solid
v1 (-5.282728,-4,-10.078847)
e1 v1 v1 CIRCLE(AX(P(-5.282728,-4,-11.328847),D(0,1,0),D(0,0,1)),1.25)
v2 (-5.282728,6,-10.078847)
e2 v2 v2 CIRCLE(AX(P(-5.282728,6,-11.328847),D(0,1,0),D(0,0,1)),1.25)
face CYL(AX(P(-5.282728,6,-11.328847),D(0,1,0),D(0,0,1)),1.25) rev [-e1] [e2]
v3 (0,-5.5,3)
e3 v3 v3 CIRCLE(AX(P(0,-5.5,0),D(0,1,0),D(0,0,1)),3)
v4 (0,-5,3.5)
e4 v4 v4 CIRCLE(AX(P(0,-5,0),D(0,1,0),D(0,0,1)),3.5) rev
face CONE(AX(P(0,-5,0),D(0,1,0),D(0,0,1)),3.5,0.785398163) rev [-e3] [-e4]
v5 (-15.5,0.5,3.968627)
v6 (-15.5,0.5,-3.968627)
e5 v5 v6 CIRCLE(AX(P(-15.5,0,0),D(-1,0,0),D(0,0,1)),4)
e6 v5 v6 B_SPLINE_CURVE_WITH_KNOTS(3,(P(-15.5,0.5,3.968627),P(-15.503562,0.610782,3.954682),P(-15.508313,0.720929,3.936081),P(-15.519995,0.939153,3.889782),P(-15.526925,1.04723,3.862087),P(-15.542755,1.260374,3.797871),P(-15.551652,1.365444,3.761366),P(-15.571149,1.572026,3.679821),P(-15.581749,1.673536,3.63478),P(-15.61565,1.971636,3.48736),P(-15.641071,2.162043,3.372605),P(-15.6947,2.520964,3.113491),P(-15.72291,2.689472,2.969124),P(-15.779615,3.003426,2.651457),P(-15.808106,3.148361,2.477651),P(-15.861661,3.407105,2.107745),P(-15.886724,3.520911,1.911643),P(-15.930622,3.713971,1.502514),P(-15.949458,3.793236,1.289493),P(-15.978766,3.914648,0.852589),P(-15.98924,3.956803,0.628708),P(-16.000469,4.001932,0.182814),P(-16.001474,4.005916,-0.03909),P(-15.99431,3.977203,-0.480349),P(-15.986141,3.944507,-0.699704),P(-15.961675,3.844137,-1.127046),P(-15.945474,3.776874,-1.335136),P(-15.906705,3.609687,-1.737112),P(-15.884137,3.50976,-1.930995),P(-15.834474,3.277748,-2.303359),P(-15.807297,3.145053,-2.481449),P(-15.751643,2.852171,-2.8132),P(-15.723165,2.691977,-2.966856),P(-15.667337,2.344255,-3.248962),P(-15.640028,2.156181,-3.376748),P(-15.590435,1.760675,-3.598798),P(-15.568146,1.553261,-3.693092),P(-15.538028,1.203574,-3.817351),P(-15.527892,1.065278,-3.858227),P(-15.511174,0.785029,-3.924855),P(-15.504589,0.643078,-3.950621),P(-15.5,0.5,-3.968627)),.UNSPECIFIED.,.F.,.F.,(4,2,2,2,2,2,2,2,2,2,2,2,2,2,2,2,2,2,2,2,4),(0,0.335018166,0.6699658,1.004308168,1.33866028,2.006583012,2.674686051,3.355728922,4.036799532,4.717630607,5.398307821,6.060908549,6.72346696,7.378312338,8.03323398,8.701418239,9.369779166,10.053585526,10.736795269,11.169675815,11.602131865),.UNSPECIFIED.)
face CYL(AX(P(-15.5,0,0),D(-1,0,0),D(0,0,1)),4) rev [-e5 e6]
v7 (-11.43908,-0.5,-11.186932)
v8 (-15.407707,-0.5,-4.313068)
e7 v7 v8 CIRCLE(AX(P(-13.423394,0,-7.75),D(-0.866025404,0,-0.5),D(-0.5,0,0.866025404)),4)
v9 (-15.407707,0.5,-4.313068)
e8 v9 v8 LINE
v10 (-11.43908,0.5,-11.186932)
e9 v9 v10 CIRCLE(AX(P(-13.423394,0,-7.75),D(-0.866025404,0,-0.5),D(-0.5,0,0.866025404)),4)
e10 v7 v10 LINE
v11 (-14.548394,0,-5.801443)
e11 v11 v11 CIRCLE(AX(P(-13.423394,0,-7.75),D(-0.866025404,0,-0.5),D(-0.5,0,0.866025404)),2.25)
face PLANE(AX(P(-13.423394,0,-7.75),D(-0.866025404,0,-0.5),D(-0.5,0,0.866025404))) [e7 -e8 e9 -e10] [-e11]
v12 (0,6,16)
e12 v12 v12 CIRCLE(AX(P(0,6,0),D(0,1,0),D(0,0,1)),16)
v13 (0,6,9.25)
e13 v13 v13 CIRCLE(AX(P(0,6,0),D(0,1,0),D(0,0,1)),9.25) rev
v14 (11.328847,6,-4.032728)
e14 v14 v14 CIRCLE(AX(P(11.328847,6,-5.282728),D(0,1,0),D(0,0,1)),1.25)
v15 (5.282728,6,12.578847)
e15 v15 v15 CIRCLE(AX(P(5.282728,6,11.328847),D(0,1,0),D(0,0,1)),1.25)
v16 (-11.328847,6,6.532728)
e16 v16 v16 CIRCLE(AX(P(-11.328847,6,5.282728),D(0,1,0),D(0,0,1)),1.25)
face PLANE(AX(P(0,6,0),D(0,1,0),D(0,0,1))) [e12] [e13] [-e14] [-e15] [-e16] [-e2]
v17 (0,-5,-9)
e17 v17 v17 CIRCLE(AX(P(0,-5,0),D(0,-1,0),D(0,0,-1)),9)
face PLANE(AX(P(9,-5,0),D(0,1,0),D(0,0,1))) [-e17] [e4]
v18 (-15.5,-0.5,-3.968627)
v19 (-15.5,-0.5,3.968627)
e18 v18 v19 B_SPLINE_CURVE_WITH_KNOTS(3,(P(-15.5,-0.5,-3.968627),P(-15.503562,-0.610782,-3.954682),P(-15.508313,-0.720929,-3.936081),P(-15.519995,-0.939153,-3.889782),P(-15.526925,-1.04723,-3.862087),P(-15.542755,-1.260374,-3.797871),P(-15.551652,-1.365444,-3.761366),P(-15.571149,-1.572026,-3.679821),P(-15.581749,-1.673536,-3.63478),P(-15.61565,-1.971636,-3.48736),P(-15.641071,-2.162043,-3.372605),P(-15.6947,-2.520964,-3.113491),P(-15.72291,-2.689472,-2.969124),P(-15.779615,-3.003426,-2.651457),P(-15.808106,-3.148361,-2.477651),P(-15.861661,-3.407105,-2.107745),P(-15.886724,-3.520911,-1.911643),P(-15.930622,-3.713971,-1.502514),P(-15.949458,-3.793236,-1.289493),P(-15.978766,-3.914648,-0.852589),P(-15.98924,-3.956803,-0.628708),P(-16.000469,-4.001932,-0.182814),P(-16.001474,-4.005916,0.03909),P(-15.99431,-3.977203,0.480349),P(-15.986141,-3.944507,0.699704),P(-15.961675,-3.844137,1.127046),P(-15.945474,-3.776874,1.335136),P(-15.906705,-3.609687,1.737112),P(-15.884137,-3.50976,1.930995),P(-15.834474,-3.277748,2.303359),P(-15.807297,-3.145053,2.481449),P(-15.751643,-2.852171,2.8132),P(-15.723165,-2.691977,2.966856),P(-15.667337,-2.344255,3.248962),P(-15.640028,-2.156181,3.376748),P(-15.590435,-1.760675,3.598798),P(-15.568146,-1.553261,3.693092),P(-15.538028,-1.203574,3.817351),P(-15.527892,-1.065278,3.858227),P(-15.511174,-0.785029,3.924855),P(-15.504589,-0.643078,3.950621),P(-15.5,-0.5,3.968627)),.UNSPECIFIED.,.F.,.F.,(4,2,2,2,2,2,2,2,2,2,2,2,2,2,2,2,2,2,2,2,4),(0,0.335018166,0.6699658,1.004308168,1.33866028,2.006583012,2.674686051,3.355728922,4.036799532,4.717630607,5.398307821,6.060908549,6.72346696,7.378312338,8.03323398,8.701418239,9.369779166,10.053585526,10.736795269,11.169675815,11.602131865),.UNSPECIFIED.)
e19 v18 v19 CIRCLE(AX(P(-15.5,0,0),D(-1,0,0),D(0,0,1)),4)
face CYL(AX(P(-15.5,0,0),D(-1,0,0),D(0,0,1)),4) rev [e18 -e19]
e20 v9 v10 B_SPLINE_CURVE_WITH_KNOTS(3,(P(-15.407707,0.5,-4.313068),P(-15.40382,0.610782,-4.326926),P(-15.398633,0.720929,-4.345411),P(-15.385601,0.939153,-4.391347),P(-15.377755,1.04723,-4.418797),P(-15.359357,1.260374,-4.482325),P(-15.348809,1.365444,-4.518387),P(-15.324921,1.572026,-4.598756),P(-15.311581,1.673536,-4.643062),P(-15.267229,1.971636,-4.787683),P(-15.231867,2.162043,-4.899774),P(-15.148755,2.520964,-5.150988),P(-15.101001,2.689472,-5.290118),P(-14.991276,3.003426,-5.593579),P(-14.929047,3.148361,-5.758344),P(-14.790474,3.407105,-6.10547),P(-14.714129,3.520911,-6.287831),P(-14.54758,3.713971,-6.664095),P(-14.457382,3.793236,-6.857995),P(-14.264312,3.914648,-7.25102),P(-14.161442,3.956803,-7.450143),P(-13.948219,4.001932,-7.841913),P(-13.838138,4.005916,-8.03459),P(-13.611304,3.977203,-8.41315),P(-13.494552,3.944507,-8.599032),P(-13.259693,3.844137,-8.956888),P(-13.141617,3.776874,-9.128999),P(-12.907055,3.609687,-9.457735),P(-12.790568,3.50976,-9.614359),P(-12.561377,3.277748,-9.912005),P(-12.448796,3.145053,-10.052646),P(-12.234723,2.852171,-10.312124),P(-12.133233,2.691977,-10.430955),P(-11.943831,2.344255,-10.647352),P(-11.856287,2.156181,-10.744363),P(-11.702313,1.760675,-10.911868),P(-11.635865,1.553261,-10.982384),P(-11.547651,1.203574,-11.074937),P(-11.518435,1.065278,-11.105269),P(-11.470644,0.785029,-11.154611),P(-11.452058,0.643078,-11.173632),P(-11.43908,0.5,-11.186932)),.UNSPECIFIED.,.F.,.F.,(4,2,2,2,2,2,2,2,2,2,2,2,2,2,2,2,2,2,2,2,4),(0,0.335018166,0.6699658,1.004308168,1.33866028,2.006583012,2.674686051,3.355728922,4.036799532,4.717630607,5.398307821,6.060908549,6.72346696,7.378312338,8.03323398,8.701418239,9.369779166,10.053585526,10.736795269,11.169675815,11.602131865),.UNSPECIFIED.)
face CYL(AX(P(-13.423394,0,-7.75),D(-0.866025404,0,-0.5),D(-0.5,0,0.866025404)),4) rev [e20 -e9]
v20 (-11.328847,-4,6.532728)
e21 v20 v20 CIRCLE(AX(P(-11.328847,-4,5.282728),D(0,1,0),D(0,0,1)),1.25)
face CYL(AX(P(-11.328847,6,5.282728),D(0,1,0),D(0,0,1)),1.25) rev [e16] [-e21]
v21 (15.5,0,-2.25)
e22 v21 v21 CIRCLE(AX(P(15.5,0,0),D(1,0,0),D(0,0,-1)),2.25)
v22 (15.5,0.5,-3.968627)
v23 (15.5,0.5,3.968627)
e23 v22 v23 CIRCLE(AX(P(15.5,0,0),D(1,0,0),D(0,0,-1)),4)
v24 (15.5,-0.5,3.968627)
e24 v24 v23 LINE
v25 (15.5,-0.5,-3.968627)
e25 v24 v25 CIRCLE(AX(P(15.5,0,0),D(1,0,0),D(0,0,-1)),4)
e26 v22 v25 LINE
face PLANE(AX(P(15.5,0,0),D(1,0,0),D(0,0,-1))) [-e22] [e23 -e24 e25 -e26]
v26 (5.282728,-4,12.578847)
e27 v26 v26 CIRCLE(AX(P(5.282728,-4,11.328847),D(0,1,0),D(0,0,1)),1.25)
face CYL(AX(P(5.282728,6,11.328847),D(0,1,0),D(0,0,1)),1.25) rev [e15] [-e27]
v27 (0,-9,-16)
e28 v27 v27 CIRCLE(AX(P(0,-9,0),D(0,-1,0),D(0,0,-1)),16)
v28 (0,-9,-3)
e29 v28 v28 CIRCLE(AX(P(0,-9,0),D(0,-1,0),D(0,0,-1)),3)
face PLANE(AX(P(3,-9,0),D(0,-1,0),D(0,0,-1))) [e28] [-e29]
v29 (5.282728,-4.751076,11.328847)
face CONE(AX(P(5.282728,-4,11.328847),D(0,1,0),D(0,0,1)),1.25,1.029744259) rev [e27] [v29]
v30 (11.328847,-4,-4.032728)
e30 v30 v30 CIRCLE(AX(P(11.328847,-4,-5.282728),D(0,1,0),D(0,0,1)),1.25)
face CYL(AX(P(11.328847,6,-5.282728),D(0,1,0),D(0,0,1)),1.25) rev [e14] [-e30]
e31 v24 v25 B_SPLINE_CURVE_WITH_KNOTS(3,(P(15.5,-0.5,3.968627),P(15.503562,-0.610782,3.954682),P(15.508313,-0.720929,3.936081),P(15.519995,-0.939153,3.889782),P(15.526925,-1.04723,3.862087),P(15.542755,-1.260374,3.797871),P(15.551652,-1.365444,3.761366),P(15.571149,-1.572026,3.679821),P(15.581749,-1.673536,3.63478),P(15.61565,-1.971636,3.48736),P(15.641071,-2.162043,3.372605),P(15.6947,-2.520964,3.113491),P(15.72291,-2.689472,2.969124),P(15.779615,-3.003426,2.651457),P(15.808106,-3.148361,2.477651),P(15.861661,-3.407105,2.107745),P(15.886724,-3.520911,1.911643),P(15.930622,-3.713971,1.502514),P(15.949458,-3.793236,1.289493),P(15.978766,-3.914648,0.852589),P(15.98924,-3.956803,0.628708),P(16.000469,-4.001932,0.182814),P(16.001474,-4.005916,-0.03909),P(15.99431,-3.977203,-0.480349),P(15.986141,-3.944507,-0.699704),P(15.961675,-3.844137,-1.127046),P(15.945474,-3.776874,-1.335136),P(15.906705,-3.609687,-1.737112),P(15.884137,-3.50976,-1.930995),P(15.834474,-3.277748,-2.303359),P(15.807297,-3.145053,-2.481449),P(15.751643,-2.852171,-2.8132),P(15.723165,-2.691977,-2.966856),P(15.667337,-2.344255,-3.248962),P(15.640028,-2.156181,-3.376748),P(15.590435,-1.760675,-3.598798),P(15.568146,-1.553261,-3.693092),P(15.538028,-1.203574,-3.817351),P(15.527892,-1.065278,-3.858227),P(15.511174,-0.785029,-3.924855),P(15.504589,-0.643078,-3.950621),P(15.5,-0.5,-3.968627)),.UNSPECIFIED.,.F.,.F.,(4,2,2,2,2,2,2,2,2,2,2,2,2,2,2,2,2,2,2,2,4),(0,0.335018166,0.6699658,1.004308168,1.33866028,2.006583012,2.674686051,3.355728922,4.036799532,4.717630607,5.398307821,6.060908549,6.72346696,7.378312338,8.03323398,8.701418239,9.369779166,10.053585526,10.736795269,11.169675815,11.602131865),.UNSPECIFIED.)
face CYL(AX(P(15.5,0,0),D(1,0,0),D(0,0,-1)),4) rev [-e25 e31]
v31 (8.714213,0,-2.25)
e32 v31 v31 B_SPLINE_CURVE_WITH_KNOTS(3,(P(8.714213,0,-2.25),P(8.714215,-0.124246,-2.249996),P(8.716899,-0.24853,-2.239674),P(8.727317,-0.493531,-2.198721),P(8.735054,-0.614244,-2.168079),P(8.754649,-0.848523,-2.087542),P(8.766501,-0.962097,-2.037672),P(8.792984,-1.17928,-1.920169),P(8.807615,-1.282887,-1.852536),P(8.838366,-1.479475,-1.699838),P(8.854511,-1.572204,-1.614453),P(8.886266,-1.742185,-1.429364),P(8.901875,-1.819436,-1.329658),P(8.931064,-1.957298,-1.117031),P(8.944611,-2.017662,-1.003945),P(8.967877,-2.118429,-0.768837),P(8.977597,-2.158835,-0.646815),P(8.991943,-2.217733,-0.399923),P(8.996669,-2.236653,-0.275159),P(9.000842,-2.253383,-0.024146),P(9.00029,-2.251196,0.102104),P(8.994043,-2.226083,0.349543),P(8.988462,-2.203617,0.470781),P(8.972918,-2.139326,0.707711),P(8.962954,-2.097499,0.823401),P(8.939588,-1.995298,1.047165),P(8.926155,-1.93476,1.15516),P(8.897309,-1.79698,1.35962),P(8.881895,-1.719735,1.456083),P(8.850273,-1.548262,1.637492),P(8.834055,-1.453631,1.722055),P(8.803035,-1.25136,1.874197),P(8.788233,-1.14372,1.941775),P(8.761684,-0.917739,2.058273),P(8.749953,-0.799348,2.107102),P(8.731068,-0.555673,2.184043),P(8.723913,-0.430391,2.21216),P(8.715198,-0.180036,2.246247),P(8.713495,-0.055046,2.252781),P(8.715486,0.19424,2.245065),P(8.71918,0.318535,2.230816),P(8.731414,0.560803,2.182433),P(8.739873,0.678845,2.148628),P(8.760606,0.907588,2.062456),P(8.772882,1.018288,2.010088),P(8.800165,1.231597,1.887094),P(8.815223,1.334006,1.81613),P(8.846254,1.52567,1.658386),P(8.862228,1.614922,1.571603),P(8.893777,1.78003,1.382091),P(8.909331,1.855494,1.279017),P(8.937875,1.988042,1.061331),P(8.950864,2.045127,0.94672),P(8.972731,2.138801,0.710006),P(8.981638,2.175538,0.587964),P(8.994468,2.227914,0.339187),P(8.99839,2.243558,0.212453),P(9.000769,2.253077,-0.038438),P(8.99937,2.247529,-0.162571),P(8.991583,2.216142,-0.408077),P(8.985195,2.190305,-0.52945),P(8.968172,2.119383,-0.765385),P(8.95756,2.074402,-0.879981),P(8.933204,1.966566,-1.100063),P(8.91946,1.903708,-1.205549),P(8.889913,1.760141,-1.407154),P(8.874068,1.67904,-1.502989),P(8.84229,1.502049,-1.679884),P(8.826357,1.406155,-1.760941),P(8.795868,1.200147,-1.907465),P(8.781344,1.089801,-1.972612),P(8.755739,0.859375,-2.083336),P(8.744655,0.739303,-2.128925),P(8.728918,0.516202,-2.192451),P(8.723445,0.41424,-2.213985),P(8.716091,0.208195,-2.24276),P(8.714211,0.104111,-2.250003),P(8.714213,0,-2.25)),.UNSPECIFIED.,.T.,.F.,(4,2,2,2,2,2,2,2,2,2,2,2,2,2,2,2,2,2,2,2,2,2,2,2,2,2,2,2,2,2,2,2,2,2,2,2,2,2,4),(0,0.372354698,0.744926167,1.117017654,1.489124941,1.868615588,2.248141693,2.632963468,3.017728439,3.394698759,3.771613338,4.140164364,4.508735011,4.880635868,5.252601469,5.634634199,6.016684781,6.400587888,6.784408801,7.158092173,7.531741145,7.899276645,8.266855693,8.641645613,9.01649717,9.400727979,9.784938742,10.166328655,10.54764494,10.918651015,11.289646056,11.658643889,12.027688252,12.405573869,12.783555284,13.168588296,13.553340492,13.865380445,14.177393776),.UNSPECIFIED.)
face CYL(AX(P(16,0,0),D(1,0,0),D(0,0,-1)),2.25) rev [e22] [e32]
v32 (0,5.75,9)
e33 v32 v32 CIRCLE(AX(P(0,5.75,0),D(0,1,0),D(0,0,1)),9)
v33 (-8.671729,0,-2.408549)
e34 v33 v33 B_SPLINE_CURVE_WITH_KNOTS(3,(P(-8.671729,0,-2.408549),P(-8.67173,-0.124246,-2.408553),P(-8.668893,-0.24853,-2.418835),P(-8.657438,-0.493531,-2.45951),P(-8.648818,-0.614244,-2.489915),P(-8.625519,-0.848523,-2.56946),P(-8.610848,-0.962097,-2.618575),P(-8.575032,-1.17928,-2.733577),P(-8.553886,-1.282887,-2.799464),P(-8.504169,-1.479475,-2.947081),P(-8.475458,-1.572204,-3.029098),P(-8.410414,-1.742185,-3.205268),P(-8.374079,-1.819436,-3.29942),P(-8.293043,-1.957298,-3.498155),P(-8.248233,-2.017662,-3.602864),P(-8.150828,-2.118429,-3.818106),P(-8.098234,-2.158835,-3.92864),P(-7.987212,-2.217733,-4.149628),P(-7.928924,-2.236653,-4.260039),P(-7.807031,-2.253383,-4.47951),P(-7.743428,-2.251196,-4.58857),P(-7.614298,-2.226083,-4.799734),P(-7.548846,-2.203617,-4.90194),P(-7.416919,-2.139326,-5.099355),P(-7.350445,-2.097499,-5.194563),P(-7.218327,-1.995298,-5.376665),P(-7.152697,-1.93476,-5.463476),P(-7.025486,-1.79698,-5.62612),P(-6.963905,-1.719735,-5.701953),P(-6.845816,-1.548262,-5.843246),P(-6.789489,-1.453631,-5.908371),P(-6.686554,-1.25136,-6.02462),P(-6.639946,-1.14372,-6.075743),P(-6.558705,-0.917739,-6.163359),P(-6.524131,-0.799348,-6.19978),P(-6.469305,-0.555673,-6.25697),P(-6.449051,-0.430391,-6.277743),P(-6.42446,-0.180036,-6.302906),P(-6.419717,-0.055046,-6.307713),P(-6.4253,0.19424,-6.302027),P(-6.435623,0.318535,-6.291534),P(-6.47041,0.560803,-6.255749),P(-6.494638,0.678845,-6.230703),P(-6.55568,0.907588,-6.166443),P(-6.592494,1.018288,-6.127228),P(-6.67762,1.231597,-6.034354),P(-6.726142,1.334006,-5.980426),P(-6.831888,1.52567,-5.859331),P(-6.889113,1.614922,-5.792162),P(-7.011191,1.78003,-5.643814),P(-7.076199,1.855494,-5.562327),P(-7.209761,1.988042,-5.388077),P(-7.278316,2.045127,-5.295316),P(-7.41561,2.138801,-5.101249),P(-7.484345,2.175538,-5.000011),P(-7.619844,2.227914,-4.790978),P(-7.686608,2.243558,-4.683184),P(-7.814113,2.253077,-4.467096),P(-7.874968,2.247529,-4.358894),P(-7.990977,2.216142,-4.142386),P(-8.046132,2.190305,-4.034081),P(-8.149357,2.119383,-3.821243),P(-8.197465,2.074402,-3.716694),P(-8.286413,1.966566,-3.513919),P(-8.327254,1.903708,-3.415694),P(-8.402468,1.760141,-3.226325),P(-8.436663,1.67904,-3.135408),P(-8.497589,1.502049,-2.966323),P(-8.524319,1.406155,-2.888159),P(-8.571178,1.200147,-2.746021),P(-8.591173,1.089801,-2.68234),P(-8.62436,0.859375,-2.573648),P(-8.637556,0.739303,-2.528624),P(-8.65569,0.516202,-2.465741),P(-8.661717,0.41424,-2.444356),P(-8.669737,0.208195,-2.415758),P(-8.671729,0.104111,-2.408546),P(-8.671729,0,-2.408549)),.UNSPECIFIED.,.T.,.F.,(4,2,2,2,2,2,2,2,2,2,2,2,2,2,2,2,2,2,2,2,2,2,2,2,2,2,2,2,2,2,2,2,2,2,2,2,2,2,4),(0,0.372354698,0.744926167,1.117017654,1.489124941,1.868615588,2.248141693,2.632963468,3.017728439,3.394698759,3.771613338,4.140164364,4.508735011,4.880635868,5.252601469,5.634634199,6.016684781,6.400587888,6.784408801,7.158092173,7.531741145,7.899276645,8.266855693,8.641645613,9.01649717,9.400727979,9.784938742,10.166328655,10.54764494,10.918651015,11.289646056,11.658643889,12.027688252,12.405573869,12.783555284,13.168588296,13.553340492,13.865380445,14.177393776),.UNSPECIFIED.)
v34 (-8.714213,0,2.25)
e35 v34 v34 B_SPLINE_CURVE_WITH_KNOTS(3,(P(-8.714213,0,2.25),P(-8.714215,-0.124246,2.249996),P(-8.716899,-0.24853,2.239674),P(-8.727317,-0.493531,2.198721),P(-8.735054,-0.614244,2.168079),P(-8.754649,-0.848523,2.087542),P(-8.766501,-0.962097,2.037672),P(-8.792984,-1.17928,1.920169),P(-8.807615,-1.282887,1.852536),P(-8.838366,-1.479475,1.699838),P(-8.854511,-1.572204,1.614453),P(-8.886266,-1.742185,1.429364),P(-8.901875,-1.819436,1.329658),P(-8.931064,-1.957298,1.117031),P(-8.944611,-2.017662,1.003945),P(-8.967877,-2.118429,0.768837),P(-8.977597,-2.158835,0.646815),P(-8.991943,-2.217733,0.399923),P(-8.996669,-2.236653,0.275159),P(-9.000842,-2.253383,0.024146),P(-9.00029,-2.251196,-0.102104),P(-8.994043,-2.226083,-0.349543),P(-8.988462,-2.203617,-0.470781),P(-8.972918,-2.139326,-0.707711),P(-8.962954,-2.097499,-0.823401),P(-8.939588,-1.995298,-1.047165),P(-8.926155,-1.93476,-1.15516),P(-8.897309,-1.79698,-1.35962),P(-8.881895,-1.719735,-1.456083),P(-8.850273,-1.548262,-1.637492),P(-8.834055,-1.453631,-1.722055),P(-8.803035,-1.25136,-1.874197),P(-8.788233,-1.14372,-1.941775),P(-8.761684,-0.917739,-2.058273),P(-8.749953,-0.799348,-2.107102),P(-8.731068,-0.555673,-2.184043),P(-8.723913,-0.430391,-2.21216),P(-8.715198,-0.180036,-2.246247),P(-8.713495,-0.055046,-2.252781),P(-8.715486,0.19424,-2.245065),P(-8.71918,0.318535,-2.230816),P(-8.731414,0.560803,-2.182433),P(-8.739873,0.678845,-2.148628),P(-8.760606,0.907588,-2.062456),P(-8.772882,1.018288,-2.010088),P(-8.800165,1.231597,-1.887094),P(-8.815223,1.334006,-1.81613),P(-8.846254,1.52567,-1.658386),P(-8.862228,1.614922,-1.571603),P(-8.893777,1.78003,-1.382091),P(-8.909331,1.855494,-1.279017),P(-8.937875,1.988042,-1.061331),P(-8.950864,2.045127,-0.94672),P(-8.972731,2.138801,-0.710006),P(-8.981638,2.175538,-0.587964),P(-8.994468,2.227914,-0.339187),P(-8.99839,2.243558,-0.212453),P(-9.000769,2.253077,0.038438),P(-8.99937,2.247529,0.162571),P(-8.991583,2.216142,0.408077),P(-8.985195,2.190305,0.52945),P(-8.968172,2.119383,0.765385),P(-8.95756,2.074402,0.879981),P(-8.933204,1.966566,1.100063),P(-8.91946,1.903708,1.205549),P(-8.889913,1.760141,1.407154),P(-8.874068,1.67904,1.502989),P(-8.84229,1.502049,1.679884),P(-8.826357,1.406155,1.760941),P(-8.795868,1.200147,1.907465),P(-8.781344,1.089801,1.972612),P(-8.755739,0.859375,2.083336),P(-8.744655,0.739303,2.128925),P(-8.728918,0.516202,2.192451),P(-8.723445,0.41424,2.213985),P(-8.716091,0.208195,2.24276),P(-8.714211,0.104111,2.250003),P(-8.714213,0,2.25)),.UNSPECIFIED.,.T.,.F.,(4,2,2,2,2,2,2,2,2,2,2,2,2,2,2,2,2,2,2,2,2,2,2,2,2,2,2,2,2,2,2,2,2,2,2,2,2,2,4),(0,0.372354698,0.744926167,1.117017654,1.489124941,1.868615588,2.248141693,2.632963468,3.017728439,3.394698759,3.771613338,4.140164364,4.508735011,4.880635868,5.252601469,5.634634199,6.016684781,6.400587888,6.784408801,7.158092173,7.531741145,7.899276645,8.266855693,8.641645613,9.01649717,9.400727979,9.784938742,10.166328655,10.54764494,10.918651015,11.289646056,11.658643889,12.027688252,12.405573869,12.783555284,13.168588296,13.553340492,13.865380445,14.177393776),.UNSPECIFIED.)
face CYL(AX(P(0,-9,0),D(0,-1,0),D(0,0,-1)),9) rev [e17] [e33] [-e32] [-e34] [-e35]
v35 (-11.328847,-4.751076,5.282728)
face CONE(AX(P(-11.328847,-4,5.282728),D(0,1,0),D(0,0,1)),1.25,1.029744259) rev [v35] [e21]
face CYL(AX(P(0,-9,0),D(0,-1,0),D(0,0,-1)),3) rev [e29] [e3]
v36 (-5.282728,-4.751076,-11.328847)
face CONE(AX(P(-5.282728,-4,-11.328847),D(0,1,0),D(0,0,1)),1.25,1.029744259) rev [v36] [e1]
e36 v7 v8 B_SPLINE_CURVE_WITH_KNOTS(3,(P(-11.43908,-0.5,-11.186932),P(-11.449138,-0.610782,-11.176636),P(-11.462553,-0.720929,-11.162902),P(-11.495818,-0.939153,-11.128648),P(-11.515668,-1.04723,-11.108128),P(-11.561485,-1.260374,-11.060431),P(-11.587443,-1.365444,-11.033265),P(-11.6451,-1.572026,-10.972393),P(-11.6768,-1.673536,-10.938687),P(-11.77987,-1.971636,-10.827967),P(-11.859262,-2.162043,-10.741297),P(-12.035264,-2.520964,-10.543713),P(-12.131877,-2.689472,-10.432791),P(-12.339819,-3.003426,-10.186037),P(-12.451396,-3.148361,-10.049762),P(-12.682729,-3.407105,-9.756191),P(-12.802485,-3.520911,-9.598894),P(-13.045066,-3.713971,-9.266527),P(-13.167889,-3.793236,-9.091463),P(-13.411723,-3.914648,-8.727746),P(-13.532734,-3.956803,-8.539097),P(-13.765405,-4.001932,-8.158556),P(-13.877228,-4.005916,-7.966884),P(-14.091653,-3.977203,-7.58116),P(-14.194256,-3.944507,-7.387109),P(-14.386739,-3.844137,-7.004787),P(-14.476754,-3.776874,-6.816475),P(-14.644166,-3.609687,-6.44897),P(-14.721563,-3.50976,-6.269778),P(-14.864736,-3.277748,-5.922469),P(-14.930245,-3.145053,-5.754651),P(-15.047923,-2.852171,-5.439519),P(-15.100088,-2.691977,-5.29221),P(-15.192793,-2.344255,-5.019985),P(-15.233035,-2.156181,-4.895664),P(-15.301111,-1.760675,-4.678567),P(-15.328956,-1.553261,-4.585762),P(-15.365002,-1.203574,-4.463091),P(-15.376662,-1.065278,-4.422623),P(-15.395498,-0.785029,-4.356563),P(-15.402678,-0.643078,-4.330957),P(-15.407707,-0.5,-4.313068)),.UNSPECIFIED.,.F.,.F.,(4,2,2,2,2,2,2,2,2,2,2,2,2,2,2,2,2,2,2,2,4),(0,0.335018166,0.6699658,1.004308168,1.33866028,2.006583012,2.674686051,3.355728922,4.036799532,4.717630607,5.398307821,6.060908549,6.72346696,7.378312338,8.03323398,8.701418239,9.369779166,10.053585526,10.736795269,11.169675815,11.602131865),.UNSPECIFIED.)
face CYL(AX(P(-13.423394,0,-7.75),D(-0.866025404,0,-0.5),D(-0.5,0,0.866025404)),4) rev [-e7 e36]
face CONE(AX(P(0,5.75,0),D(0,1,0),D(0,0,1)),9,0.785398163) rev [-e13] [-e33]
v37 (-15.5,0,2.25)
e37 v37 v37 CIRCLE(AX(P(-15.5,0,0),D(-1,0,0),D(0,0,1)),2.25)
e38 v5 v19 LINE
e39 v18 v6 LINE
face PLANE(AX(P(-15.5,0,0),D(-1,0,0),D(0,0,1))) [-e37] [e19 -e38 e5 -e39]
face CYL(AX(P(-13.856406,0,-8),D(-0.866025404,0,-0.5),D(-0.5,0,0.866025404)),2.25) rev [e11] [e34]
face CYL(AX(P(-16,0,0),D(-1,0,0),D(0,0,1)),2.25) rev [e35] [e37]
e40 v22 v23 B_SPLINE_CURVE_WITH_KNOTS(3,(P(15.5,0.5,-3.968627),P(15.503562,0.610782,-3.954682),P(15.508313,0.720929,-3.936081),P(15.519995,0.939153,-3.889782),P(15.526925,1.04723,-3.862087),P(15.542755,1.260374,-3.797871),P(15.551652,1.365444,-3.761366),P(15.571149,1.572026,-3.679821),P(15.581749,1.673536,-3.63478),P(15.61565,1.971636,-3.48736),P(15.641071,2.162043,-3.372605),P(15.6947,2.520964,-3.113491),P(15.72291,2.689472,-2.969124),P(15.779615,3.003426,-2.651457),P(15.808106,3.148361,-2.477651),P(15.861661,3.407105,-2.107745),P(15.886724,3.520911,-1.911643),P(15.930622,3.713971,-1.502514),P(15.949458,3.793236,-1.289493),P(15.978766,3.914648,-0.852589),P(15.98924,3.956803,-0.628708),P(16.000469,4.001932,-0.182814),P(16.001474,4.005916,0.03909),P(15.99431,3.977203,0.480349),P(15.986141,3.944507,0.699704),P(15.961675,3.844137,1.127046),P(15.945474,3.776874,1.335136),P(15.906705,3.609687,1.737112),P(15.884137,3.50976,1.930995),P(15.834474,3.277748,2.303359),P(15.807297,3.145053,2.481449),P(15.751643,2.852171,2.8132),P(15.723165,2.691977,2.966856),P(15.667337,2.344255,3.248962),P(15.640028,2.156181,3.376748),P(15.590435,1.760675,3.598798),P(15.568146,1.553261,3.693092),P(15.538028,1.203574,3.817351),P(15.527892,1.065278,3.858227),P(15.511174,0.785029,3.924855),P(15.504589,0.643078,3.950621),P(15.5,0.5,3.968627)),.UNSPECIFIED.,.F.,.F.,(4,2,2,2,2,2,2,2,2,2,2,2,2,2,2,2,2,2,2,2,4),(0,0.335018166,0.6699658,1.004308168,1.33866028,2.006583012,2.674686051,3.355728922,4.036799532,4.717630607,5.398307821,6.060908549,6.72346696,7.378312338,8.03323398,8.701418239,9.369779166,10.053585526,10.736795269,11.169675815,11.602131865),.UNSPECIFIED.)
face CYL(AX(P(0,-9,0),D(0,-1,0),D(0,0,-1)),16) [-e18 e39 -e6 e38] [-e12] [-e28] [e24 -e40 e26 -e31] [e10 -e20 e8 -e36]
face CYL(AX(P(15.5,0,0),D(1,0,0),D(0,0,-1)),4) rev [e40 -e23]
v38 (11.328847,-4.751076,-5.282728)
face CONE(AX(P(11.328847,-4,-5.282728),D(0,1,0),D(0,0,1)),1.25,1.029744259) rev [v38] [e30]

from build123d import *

# Parameters (mm, degrees)
ESBO_O4_W                        = 2.25
ESBO_O4_H                        = 16
F_4_5_4_5_DIAMETER_HOLE2_D       = 4.5
F_4_5_4_5_DIAMETER_HOLE2_DEPTH   = 18
F_4_5_4_5_DIAMETER_HOLE2_TIP     = 1.351936393
ESBO_O12_R                       = 16
ESBO_O12_R_2                     = 9
RESSALTO_EXTRUS_O1_DEPTH         = 1
CHANFRO1_SIZE                    = 0.5
CHANFRO2_SIZE                    = 0.25
FURO_DE_DI_METRO_4_5_4_5_2_D     = 4.5
FURO_DE_DI_METRO_4_5_4_5_2_DEPTH = 8
FURO_DE_DI_METRO_4_5_4_5_2_TIP   = 1.351936393
CORTE_EXTRUS_O4_START            = -0.5
ESBO_O18_R                       = 4
ESBO_O18_R_2                     = 2.25
CORTE_EXTRUS_O4_DEPTH            = 0.5
PADR_OCIRCULAR6_COUNT            = 2
PADR_OCIRCULAR6_ANGLE            = 30
PADR_OCIRCULAR7_COUNT            = 2
PADR_OCIRCULAR7_ANGLE            = 210


# Read off the part's stored shape, not the designer's step: PadrãoCircular5
with BuildPart() as part:
    # Esboço1 → Revolução1 (revolve)
    with BuildSketch(Plane.XY, mode=Mode.PRIVATE) as revolu_o1_sk:
        Polygon((3, -9), (16, -9), (16, 5), (9, 5), (9, -5), (3, -5), align=None)
    revolve(revolu_o1_sk.sketch.rotate(Axis((0, -9, 0), (0, 1, 0)), 90), axis=Axis((0, -9, 0), (0, 1, 0)))

    # Esboço4 → Furo de diâmetro Ø4.5 (4.5)1 (revolve, cut)
    with BuildSketch(Plane(origin=(16, 0, 0), x_dir=(0, 0, -1), z_dir=(0, 1, 0))):
        with Locations((1.125, 8)):
            Rectangle(ESBO_O4_W, ESBO_O4_H)
    revolve(axis=Axis((22.35, 0, 0), (-1, 0, 0)), mode=Mode.SUBTRACT)

    # Ø4.5 (4.5) Diameter Hole2
    with Locations(Plane(origin=(-13.856406461, 0, -8), x_dir=(0, -1, 0), z_dir=(-0.8660254037844364, 0, -0.5000000000000041))):
        with Locations((0, 0)):
            Hole(F_4_5_4_5_DIAMETER_HOLE2_D / 2, depth=F_4_5_4_5_DIAMETER_HOLE2_DEPTH)
            with Locations((0, 0, -(F_4_5_4_5_DIAMETER_HOLE2_DEPTH + F_4_5_4_5_DIAMETER_HOLE2_TIP / 2))):  # 118° drill point
                Cone(0, F_4_5_4_5_DIAMETER_HOLE2_D / 2, F_4_5_4_5_DIAMETER_HOLE2_TIP, mode=Mode.SUBTRACT)

    # Esboço12 → Ressalto-extrusão1 (add)
    with BuildSketch(Plane(origin=(0, 5, 0), x_dir=(1, 0, 0), z_dir=(0, 1, 0))):
        with Locations(Location((0, 0, 0), (0, 0, 90))):
            Circle(ESBO_O12_R)
        with Locations(Location((0, 0, 0), (0, 0, 90))):
            Circle(ESBO_O12_R_2, mode=Mode.SUBTRACT)
    extrude(amount=RESSALTO_EXTRUS_O1_DEPTH)

    # Esboço13 → Furo roscado de M3x0.51 (revolve, cut)
    with BuildSketch(Plane(origin=(11.328847338, 6, -5.282728272), x_dir=(0, 0, 1), z_dir=(1, 0, 0))):
        Polygon((0, 0), (0, 10.751075774), (1.25, 10), (1.25, 0), align=None)
    revolve(axis=Axis((11.328847338, 12.35, -5.282728272), (0, -1, 0)), mode=Mode.SUBTRACT)

    # PadrãoCircular5 outline → PadrãoCircular5 (revolve, cut)
    with BuildSketch(Plane(origin=(5.282728272, 0, 11.328847338), x_dir=(1, 0, 0), z_dir=(0, 0, 1))):
        Polygon((0, 6), (0, -4.751075774), (1.25, -4), (1.25, 6), align=None)
    revolve(axis=Axis((5.282728272, 0, 11.328847338), (0, 1, 0)), mode=Mode.SUBTRACT)

    # Padr_oCircular5 2 outline → Padr_oCircular5 2 (revolve, cut)
    with BuildSketch(Plane(origin=(-11.328847338, 0, 5.282728272), x_dir=(1, 0, 0), z_dir=(0, 0, 1))):
        Polygon((0, 6), (0, -4.751075774), (1.25, -4), (1.25, 6), align=None)
    revolve(axis=Axis((-11.328847338, 0, 5.282728272), (0, 1, 0)), mode=Mode.SUBTRACT)

    # Padr_oCircular5 3 outline → Padr_oCircular5 3 (revolve, cut)
    with BuildSketch(Plane(origin=(-5.282728272, 0, -11.328847338), x_dir=(1, 0, 0), z_dir=(0, 0, 1))):
        Polygon((0, 6), (0, -4.751075774), (1.25, -4), (1.25, 6), align=None)
    revolve(axis=Axis((-5.282728272, 0, -11.328847338), (0, 1, 0)), mode=Mode.SUBTRACT)

    # Chanfro1
    chanfro1_edges = [part.edges().sort_by_distance(p)[0] for p in [
        (0, -5, 3),
    ]]
    chamfer(chanfro1_edges, length=CHANFRO1_SIZE)

    # Chanfro2
    chanfro2_edges = [part.edges().sort_by_distance(p)[0] for p in [
        (0, 6, 9),
    ]]
    chamfer(chanfro2_edges, length=CHANFRO2_SIZE)

    # Furo de diâmetro Ø4.5 (4.5)2
    with Locations(Plane(origin=(-16, 0, 0), x_dir=(0, 0, -1), z_dir=(-1, 0, 0))):
        with Locations((0, 0)):
            Hole(FURO_DE_DI_METRO_4_5_4_5_2_D / 2, depth=FURO_DE_DI_METRO_4_5_4_5_2_DEPTH)
            with Locations((0, 0, -(FURO_DE_DI_METRO_4_5_4_5_2_DEPTH + FURO_DE_DI_METRO_4_5_4_5_2_TIP / 2))):  # 118° drill point
                Cone(0, FURO_DE_DI_METRO_4_5_4_5_2_D / 2, FURO_DE_DI_METRO_4_5_4_5_2_TIP, mode=Mode.SUBTRACT)

    # Esboço18 → Corte-extrusão4 (cut)
    with BuildSketch(Plane(origin=(-13.856406461, 0, -8), x_dir=(0, -1, 0), z_dir=(-0.8660254037844364, 0, -0.5000000000000041)).offset(CORTE_EXTRUS_O4_START)):
        Circle(ESBO_O18_R)
        with Locations(Location((0, 0, 0), (0, 0, 90))):
            Circle(ESBO_O18_R_2, mode=Mode.SUBTRACT)
    corte_extrus_o4 = extrude(amount=CORTE_EXTRUS_O4_DEPTH, mode=Mode.SUBTRACT)

    # PadrãoCircular6: Corte-extrusão4 ×2 about axis
    padr_ocircular6_axis = Axis((0, -9.75, 0), (0, 1, 0))
    for i in range(1, PADR_OCIRCULAR6_COUNT):
        add(corte_extrus_o4.rotate(padr_ocircular6_axis, i * PADR_OCIRCULAR6_ANGLE / (PADR_OCIRCULAR6_COUNT - 1)), mode=Mode.SUBTRACT)

    # PadrãoCircular7: Corte-extrusão4 ×2 about axis
    padr_ocircular7_axis = Axis((0, -9.75, 0), (0, 1, 0))
    for i in range(1, PADR_OCIRCULAR7_COUNT):
        add(corte_extrus_o4.rotate(padr_ocircular7_axis, i * PADR_OCIRCULAR7_ANGLE / (PADR_OCIRCULAR7_COUNT - 1)), mode=Mode.SUBTRACT)


solid = part.part
